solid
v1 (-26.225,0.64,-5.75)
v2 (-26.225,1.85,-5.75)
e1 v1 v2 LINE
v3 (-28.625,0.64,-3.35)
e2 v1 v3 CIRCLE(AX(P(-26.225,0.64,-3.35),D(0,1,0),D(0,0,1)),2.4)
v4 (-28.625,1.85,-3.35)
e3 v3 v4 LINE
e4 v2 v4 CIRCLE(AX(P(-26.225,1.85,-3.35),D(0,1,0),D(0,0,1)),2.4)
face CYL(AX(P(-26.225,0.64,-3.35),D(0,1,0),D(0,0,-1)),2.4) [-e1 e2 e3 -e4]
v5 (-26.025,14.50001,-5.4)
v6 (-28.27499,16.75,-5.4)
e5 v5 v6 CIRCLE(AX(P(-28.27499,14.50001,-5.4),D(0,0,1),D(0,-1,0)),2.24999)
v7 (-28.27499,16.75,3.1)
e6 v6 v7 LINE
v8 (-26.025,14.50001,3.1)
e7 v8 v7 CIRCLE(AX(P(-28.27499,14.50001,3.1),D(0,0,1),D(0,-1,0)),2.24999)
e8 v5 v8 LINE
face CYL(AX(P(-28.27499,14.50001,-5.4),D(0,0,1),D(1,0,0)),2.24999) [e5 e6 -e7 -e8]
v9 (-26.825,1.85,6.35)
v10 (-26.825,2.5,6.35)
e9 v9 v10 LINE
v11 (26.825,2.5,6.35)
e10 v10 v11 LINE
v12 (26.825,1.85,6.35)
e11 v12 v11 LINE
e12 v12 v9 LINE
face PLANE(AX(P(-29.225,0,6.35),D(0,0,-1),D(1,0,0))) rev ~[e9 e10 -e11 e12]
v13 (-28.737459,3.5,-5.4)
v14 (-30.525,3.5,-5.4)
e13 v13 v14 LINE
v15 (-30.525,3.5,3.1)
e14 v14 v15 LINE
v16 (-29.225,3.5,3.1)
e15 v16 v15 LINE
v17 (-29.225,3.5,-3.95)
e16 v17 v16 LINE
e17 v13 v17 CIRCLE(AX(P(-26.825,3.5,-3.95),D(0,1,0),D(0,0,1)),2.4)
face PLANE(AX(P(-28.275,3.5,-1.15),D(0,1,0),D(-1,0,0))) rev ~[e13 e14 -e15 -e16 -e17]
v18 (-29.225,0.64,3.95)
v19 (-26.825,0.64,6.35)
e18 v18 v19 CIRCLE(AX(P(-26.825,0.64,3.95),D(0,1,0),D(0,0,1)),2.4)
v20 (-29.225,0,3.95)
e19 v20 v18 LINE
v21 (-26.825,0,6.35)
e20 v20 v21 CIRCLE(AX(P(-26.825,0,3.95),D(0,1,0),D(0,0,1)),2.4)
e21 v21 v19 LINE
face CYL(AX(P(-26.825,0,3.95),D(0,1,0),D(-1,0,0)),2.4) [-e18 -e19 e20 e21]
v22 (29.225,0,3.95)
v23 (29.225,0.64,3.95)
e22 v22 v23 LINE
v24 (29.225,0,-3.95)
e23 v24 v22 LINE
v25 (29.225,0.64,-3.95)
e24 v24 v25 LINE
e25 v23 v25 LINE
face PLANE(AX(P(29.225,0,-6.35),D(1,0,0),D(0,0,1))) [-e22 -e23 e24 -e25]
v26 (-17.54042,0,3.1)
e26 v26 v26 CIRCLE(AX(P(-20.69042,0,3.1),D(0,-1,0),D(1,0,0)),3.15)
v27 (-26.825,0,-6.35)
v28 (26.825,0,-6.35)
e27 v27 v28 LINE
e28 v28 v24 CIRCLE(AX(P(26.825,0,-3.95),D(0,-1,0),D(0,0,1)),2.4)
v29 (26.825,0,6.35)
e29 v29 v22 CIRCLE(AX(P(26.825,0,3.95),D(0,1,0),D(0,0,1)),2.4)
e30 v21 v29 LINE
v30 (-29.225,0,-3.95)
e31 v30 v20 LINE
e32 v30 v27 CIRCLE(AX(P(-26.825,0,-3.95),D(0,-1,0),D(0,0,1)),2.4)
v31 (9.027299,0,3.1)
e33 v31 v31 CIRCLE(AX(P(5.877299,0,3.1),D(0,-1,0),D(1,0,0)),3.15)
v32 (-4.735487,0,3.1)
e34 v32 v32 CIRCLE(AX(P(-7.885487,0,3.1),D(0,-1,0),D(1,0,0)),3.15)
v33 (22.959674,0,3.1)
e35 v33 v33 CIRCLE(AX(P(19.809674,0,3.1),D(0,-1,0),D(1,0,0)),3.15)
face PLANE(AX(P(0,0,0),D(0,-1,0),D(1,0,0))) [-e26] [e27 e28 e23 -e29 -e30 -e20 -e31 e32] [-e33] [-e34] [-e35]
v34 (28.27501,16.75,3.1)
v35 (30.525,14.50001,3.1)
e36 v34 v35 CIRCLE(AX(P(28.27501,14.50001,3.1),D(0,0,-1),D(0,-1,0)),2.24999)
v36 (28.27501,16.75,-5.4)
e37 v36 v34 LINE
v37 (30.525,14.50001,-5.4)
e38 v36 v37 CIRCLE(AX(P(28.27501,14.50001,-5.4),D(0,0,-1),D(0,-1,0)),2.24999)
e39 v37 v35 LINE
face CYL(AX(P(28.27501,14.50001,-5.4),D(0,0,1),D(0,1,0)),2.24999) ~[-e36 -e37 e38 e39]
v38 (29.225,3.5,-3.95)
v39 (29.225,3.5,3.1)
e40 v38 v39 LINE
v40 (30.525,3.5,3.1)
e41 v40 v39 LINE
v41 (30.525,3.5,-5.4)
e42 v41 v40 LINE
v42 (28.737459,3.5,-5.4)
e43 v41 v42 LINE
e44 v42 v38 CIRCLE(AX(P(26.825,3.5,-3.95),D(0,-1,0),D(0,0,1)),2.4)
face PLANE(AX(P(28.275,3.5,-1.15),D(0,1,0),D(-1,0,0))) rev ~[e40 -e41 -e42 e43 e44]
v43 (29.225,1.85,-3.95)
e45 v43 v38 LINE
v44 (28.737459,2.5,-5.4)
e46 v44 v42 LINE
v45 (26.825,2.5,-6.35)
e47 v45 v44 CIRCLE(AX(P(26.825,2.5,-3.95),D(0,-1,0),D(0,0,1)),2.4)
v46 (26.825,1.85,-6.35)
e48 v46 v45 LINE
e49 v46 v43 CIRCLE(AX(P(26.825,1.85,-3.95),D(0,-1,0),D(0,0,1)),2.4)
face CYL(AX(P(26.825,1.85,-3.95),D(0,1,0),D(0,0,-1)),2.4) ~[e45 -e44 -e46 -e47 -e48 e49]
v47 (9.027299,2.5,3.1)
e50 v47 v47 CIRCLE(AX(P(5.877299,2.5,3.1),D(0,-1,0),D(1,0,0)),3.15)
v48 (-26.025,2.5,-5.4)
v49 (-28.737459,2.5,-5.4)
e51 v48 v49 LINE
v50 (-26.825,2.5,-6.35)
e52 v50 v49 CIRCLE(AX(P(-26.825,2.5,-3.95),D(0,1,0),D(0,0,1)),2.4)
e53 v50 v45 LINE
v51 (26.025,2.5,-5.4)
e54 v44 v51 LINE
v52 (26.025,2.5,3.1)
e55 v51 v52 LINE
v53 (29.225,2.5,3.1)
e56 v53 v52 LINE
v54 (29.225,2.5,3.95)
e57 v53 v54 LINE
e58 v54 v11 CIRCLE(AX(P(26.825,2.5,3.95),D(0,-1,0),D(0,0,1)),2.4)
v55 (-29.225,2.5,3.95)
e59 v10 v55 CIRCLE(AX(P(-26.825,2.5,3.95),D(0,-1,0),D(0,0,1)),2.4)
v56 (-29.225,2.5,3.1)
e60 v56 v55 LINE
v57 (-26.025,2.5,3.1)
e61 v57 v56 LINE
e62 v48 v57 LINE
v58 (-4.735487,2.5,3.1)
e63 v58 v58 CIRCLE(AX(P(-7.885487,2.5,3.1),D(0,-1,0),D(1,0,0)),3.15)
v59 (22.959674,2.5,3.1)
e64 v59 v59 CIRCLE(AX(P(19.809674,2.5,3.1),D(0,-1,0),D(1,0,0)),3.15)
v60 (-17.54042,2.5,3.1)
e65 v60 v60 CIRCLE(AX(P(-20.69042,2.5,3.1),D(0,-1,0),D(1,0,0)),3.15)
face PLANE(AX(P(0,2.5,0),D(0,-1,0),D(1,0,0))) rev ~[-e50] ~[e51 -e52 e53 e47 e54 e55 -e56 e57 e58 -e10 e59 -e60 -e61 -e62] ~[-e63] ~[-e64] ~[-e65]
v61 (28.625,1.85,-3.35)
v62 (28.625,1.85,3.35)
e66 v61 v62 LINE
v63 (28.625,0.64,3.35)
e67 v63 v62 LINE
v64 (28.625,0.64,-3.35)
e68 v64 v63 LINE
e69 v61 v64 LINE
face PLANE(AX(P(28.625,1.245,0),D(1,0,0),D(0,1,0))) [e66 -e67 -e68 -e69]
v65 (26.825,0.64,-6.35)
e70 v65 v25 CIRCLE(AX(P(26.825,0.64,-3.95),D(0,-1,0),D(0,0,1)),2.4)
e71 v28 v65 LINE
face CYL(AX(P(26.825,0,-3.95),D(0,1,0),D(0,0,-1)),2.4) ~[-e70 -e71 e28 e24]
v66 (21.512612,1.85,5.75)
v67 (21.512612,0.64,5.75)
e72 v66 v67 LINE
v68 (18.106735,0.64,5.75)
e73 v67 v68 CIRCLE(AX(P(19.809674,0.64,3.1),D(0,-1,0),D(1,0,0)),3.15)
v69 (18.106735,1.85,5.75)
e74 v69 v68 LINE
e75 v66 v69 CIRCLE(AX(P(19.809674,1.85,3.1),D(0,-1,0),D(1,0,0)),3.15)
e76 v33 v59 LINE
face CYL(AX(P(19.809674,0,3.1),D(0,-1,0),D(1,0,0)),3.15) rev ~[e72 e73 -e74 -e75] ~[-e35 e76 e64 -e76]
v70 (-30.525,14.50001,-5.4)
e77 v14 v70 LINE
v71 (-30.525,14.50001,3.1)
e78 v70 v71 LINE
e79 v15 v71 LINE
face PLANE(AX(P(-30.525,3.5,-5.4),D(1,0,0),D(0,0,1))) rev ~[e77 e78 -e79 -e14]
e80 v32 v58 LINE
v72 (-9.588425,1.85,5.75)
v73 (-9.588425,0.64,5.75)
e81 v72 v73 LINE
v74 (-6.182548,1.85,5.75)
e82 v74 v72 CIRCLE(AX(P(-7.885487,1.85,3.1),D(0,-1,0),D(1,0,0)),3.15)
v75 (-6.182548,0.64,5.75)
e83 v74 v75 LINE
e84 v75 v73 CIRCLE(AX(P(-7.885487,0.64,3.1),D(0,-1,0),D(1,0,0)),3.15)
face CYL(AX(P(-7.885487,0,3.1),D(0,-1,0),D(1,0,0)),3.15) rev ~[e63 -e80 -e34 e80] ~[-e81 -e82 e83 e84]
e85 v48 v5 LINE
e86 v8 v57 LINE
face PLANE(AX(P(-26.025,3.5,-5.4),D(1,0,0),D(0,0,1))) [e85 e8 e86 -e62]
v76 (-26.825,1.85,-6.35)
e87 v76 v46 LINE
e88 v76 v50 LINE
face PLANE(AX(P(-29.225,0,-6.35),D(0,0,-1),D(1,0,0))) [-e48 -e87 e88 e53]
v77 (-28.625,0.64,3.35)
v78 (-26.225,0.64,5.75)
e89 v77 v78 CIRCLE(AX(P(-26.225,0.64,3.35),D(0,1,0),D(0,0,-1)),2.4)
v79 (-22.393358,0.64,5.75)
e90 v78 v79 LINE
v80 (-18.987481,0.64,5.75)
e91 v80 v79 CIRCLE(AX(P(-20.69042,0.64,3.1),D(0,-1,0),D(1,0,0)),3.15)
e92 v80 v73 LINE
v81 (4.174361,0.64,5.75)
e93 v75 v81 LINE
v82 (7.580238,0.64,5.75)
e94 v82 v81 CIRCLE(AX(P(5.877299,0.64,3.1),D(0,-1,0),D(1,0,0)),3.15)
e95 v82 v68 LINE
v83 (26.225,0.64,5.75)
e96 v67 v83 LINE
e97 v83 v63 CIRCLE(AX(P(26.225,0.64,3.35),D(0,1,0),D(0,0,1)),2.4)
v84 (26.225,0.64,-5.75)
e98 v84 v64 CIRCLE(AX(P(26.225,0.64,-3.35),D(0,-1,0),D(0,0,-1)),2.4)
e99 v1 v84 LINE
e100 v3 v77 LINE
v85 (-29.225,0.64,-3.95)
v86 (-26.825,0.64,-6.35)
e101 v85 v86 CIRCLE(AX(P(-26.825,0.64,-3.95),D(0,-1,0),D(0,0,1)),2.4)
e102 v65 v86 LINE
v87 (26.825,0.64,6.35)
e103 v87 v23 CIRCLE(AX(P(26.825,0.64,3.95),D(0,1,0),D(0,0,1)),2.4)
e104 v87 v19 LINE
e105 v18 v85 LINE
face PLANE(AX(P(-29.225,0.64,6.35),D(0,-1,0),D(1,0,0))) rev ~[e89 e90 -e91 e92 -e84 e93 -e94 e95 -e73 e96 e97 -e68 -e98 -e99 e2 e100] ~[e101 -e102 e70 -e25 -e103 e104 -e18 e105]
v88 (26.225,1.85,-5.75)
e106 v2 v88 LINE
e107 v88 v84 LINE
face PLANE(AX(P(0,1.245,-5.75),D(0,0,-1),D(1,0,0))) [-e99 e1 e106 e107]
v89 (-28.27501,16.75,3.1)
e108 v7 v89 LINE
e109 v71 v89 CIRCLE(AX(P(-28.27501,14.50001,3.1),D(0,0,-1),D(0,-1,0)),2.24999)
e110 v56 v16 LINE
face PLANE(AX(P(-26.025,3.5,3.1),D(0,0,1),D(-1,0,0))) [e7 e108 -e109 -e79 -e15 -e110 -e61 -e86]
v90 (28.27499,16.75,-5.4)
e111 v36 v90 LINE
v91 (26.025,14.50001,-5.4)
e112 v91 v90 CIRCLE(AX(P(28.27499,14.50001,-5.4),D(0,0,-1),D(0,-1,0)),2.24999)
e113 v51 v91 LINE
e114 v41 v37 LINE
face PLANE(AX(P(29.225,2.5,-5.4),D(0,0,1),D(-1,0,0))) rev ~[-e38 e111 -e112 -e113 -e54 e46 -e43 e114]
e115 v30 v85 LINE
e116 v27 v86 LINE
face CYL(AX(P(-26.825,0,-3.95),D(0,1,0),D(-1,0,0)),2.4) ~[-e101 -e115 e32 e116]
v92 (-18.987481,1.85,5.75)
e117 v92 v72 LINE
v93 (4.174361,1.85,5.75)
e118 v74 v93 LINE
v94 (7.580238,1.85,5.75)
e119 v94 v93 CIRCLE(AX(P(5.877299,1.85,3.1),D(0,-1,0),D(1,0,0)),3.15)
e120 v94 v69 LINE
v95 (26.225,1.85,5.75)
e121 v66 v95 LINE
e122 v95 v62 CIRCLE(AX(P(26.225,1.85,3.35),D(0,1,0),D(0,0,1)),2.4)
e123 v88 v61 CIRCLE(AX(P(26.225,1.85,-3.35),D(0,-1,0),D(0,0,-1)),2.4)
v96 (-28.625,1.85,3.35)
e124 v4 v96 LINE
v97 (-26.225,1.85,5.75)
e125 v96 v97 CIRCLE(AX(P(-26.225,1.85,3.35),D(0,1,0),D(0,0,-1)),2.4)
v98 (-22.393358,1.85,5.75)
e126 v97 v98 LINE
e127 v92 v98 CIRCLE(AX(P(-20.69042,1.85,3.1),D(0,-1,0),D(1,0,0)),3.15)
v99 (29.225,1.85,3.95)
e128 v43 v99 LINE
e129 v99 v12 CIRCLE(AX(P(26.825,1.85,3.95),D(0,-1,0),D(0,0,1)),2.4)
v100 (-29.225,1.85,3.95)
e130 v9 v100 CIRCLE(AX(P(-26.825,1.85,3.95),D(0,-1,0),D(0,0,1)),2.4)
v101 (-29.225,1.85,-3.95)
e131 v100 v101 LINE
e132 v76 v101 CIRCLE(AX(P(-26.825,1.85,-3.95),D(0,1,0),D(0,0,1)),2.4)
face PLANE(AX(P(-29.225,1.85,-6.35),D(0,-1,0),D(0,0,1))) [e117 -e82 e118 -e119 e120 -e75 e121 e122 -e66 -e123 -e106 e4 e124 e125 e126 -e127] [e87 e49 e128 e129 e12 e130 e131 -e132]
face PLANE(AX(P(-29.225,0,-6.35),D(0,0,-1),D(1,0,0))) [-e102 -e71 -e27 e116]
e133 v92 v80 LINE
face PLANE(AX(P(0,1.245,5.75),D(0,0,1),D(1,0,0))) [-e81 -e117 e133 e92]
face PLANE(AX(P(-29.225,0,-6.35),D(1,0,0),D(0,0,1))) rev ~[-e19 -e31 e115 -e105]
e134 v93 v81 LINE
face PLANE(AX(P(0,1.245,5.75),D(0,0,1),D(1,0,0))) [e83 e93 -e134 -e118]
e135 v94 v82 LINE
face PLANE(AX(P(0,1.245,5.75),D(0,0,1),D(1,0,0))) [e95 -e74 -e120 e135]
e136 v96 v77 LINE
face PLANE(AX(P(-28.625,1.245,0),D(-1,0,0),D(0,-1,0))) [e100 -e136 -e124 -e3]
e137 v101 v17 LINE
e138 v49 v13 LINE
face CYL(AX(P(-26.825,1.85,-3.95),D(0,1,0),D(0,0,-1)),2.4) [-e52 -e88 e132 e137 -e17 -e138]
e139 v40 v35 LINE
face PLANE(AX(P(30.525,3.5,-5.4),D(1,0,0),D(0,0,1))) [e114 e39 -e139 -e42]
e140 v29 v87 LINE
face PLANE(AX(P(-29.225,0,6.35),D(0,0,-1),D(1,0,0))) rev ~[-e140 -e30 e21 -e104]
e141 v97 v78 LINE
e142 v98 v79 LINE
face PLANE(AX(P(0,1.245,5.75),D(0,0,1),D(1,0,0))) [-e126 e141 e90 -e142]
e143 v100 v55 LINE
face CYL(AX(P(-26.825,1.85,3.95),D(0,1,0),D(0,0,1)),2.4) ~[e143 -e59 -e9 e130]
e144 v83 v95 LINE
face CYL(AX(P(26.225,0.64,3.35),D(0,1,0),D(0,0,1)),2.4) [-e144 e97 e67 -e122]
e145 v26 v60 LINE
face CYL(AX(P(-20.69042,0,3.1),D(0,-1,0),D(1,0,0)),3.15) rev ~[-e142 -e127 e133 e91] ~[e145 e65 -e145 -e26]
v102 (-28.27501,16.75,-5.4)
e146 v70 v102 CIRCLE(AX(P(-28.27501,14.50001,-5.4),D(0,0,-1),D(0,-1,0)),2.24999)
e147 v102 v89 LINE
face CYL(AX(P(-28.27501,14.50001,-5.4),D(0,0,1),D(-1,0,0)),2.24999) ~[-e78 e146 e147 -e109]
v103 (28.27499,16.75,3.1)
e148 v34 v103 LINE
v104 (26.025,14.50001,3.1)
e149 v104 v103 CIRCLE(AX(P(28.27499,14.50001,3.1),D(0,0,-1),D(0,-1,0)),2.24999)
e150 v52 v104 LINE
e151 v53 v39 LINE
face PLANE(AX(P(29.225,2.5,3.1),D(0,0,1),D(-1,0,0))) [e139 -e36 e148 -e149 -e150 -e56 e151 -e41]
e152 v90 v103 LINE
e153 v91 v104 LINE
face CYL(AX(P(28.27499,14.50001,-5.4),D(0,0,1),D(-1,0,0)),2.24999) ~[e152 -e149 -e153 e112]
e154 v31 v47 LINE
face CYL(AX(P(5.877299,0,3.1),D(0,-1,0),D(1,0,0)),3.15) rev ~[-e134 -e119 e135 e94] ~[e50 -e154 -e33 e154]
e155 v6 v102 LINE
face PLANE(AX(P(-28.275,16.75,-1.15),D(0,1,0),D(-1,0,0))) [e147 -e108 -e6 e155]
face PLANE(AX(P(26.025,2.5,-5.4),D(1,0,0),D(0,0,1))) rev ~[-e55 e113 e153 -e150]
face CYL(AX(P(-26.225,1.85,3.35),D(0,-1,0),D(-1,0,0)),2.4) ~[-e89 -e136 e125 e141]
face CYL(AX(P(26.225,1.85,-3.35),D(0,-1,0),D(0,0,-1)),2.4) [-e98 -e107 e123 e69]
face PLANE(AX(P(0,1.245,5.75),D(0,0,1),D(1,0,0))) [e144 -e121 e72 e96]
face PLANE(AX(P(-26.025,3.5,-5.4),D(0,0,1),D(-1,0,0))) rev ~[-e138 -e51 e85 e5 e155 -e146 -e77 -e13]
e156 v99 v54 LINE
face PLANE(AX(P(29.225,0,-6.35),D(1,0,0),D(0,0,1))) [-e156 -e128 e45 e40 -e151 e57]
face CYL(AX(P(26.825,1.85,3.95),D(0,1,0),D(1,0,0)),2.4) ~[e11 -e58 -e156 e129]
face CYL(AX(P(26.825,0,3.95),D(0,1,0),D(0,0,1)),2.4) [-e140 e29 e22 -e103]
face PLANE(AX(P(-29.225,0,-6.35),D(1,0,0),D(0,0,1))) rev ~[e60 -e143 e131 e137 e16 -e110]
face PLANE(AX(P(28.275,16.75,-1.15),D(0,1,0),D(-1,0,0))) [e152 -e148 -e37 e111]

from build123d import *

# Parameters (mm, degrees)
F0_W      = 58.45
F0_H      = 12.7
F1_DEPTH  = 2.5
F2_W      = 58.45
F2_H      = 1.21
F6_DEPTH  = 0.6
F4_W      = 58.45
F4_H      = 1.21
F7_DEPTH  = 0.6
F5_W      = 1.21
F5_H      = 12.7
F8_DEPTH  = 0.6
F3_W      = 1.21
F3_H      = 12.7
F9_DEPTH  = 0.6
F10_W     = 3.2
F10_H     = 8.5
F11_DEPTH = 1
F12_R     = 2.4
F14_W     = 4.5
F14_H     = 8.5
F13_W     = 4.5
F13_H     = 8.5
F15_DEPTH = 13.25
F16_R     = 2.24999
F17_R     = 3.15
F18_DEPTH = 16.751


# Not quite as in the source:
# - a fillet or chamfer is up to 0.001 mm smaller than in the source, because OpenCascade refuses the exact size


with BuildPart() as f1:
    # F0 (on Front) → F1 (new body)
    with BuildSketch(Plane.XZ):
        Rectangle(F0_W, F0_H)
    extrude(amount=-F1_DEPTH)

    # F2 (on face) → F6 (cut)
    with BuildSketch(Plane.XY.offset(6.35)):
        with Locations((0, 1.245)):
            Rectangle(F2_W, F2_H)
    extrude(amount=-F6_DEPTH, mode=Mode.SUBTRACT)

    # F4 (on face) → F7 (cut)
    with BuildSketch(Plane(origin=(0, 0, -6.35), x_dir=(1, 0, 0), z_dir=(0, 0, -1))):
        with Locations((0, -1.245)):
            Rectangle(F4_W, F4_H)
    extrude(amount=-F7_DEPTH, mode=Mode.SUBTRACT)

    # F5 (on face) → F8 (cut)
    with BuildSketch(Plane.YZ.offset(29.225)):
        with Locations((1.245, 0)):
            Rectangle(F5_W, F5_H)
    extrude(amount=-F8_DEPTH, mode=Mode.SUBTRACT)

    # F3 (on face) → F9 (cut)
    with BuildSketch(Plane(origin=(-29.225, 0, 0), x_dir=(0, -1, 0), z_dir=(-1, 0, 0))):
        with Locations((-1.245, 0)):
            Rectangle(F3_W, F3_H)
    extrude(amount=-F9_DEPTH, mode=Mode.SUBTRACT)

    # F10 (on face) → F11 (join)
    with BuildSketch(Plane(origin=(0, 2.5, 0), x_dir=(-1, 0, 0), z_dir=(0, 1, 0))):
        with Locations((-27.625, -1.15)):
            Rectangle(F10_W, F10_H)
        with Locations((27.625, -1.15)):
            Rectangle(F10_W, F10_H)
    extrude(amount=F11_DEPTH)

    # F12
    f12_edges = [f1.edges().sort_by_distance(p)[0] for p in [
        (-29.225, 2.175, -6.35),
        (-28.625, 1.245, -5.75),
        (-29.225, 0.32, -6.35),
        (-29.225, 0.32, 6.35),
        (-28.625, 1.245, 5.75),
        (-29.225, 2.175, 6.35),
        (29.225, 0.32, 6.35),
        (28.625, 1.245, 5.75),
        (29.225, 2.175, 6.35),
        (29.225, 0.32, -6.35),
        (28.625, 1.245, -5.75),
        (29.225, 2.175, -6.35),
    ]]
    fillet(f12_edges, radius=F12_R)

    # F14 (on face) + F13 (on face) → F15 (join)
    with BuildSketch(Plane(origin=(0, 3.5, 0), x_dir=(-1, 0, 0), z_dir=(0, 1, 0))):
        with Locations((28.275, -1.15)):
            Rectangle(F14_W, F14_H)
    with BuildSketch(Plane(origin=(0, 3.5, 0), x_dir=(-1, 0, 0), z_dir=(0, 1, 0))):
        with Locations((-28.275, -1.15)):
            Rectangle(F13_W, F13_H)
    extrude(amount=F15_DEPTH)

    # F16 (radius 2.25 in the source; OpenCascade refuses exactly that, so slightly less here)
    f16_edges = [f1.edges().sort_by_distance(p)[0] for p in [
        (26.025, 16.75, -1.15),
        (30.525, 16.75, -1.15),
        (-26.025, 16.75, -1.15),
        (-30.525, 16.75, -1.15),
    ]]
    fillet(f16_edges, radius=F16_R)

    # F17 (on face) → F18 (cut, through all)
    with BuildSketch(Plane.XZ):
        with Locations((19.8096737738, 3.1)):
            Circle(F17_R)
        with Locations((5.8772991731, 3.1)):
            Circle(F17_R)
        with Locations((-7.8854865344, 3.1)):
            Circle(F17_R)
        with Locations((-20.6904198083, 3.1)):
            Circle(F17_R)
    extrude(amount=-F18_DEPTH, mode=Mode.SUBTRACT)


solid = f1.part
